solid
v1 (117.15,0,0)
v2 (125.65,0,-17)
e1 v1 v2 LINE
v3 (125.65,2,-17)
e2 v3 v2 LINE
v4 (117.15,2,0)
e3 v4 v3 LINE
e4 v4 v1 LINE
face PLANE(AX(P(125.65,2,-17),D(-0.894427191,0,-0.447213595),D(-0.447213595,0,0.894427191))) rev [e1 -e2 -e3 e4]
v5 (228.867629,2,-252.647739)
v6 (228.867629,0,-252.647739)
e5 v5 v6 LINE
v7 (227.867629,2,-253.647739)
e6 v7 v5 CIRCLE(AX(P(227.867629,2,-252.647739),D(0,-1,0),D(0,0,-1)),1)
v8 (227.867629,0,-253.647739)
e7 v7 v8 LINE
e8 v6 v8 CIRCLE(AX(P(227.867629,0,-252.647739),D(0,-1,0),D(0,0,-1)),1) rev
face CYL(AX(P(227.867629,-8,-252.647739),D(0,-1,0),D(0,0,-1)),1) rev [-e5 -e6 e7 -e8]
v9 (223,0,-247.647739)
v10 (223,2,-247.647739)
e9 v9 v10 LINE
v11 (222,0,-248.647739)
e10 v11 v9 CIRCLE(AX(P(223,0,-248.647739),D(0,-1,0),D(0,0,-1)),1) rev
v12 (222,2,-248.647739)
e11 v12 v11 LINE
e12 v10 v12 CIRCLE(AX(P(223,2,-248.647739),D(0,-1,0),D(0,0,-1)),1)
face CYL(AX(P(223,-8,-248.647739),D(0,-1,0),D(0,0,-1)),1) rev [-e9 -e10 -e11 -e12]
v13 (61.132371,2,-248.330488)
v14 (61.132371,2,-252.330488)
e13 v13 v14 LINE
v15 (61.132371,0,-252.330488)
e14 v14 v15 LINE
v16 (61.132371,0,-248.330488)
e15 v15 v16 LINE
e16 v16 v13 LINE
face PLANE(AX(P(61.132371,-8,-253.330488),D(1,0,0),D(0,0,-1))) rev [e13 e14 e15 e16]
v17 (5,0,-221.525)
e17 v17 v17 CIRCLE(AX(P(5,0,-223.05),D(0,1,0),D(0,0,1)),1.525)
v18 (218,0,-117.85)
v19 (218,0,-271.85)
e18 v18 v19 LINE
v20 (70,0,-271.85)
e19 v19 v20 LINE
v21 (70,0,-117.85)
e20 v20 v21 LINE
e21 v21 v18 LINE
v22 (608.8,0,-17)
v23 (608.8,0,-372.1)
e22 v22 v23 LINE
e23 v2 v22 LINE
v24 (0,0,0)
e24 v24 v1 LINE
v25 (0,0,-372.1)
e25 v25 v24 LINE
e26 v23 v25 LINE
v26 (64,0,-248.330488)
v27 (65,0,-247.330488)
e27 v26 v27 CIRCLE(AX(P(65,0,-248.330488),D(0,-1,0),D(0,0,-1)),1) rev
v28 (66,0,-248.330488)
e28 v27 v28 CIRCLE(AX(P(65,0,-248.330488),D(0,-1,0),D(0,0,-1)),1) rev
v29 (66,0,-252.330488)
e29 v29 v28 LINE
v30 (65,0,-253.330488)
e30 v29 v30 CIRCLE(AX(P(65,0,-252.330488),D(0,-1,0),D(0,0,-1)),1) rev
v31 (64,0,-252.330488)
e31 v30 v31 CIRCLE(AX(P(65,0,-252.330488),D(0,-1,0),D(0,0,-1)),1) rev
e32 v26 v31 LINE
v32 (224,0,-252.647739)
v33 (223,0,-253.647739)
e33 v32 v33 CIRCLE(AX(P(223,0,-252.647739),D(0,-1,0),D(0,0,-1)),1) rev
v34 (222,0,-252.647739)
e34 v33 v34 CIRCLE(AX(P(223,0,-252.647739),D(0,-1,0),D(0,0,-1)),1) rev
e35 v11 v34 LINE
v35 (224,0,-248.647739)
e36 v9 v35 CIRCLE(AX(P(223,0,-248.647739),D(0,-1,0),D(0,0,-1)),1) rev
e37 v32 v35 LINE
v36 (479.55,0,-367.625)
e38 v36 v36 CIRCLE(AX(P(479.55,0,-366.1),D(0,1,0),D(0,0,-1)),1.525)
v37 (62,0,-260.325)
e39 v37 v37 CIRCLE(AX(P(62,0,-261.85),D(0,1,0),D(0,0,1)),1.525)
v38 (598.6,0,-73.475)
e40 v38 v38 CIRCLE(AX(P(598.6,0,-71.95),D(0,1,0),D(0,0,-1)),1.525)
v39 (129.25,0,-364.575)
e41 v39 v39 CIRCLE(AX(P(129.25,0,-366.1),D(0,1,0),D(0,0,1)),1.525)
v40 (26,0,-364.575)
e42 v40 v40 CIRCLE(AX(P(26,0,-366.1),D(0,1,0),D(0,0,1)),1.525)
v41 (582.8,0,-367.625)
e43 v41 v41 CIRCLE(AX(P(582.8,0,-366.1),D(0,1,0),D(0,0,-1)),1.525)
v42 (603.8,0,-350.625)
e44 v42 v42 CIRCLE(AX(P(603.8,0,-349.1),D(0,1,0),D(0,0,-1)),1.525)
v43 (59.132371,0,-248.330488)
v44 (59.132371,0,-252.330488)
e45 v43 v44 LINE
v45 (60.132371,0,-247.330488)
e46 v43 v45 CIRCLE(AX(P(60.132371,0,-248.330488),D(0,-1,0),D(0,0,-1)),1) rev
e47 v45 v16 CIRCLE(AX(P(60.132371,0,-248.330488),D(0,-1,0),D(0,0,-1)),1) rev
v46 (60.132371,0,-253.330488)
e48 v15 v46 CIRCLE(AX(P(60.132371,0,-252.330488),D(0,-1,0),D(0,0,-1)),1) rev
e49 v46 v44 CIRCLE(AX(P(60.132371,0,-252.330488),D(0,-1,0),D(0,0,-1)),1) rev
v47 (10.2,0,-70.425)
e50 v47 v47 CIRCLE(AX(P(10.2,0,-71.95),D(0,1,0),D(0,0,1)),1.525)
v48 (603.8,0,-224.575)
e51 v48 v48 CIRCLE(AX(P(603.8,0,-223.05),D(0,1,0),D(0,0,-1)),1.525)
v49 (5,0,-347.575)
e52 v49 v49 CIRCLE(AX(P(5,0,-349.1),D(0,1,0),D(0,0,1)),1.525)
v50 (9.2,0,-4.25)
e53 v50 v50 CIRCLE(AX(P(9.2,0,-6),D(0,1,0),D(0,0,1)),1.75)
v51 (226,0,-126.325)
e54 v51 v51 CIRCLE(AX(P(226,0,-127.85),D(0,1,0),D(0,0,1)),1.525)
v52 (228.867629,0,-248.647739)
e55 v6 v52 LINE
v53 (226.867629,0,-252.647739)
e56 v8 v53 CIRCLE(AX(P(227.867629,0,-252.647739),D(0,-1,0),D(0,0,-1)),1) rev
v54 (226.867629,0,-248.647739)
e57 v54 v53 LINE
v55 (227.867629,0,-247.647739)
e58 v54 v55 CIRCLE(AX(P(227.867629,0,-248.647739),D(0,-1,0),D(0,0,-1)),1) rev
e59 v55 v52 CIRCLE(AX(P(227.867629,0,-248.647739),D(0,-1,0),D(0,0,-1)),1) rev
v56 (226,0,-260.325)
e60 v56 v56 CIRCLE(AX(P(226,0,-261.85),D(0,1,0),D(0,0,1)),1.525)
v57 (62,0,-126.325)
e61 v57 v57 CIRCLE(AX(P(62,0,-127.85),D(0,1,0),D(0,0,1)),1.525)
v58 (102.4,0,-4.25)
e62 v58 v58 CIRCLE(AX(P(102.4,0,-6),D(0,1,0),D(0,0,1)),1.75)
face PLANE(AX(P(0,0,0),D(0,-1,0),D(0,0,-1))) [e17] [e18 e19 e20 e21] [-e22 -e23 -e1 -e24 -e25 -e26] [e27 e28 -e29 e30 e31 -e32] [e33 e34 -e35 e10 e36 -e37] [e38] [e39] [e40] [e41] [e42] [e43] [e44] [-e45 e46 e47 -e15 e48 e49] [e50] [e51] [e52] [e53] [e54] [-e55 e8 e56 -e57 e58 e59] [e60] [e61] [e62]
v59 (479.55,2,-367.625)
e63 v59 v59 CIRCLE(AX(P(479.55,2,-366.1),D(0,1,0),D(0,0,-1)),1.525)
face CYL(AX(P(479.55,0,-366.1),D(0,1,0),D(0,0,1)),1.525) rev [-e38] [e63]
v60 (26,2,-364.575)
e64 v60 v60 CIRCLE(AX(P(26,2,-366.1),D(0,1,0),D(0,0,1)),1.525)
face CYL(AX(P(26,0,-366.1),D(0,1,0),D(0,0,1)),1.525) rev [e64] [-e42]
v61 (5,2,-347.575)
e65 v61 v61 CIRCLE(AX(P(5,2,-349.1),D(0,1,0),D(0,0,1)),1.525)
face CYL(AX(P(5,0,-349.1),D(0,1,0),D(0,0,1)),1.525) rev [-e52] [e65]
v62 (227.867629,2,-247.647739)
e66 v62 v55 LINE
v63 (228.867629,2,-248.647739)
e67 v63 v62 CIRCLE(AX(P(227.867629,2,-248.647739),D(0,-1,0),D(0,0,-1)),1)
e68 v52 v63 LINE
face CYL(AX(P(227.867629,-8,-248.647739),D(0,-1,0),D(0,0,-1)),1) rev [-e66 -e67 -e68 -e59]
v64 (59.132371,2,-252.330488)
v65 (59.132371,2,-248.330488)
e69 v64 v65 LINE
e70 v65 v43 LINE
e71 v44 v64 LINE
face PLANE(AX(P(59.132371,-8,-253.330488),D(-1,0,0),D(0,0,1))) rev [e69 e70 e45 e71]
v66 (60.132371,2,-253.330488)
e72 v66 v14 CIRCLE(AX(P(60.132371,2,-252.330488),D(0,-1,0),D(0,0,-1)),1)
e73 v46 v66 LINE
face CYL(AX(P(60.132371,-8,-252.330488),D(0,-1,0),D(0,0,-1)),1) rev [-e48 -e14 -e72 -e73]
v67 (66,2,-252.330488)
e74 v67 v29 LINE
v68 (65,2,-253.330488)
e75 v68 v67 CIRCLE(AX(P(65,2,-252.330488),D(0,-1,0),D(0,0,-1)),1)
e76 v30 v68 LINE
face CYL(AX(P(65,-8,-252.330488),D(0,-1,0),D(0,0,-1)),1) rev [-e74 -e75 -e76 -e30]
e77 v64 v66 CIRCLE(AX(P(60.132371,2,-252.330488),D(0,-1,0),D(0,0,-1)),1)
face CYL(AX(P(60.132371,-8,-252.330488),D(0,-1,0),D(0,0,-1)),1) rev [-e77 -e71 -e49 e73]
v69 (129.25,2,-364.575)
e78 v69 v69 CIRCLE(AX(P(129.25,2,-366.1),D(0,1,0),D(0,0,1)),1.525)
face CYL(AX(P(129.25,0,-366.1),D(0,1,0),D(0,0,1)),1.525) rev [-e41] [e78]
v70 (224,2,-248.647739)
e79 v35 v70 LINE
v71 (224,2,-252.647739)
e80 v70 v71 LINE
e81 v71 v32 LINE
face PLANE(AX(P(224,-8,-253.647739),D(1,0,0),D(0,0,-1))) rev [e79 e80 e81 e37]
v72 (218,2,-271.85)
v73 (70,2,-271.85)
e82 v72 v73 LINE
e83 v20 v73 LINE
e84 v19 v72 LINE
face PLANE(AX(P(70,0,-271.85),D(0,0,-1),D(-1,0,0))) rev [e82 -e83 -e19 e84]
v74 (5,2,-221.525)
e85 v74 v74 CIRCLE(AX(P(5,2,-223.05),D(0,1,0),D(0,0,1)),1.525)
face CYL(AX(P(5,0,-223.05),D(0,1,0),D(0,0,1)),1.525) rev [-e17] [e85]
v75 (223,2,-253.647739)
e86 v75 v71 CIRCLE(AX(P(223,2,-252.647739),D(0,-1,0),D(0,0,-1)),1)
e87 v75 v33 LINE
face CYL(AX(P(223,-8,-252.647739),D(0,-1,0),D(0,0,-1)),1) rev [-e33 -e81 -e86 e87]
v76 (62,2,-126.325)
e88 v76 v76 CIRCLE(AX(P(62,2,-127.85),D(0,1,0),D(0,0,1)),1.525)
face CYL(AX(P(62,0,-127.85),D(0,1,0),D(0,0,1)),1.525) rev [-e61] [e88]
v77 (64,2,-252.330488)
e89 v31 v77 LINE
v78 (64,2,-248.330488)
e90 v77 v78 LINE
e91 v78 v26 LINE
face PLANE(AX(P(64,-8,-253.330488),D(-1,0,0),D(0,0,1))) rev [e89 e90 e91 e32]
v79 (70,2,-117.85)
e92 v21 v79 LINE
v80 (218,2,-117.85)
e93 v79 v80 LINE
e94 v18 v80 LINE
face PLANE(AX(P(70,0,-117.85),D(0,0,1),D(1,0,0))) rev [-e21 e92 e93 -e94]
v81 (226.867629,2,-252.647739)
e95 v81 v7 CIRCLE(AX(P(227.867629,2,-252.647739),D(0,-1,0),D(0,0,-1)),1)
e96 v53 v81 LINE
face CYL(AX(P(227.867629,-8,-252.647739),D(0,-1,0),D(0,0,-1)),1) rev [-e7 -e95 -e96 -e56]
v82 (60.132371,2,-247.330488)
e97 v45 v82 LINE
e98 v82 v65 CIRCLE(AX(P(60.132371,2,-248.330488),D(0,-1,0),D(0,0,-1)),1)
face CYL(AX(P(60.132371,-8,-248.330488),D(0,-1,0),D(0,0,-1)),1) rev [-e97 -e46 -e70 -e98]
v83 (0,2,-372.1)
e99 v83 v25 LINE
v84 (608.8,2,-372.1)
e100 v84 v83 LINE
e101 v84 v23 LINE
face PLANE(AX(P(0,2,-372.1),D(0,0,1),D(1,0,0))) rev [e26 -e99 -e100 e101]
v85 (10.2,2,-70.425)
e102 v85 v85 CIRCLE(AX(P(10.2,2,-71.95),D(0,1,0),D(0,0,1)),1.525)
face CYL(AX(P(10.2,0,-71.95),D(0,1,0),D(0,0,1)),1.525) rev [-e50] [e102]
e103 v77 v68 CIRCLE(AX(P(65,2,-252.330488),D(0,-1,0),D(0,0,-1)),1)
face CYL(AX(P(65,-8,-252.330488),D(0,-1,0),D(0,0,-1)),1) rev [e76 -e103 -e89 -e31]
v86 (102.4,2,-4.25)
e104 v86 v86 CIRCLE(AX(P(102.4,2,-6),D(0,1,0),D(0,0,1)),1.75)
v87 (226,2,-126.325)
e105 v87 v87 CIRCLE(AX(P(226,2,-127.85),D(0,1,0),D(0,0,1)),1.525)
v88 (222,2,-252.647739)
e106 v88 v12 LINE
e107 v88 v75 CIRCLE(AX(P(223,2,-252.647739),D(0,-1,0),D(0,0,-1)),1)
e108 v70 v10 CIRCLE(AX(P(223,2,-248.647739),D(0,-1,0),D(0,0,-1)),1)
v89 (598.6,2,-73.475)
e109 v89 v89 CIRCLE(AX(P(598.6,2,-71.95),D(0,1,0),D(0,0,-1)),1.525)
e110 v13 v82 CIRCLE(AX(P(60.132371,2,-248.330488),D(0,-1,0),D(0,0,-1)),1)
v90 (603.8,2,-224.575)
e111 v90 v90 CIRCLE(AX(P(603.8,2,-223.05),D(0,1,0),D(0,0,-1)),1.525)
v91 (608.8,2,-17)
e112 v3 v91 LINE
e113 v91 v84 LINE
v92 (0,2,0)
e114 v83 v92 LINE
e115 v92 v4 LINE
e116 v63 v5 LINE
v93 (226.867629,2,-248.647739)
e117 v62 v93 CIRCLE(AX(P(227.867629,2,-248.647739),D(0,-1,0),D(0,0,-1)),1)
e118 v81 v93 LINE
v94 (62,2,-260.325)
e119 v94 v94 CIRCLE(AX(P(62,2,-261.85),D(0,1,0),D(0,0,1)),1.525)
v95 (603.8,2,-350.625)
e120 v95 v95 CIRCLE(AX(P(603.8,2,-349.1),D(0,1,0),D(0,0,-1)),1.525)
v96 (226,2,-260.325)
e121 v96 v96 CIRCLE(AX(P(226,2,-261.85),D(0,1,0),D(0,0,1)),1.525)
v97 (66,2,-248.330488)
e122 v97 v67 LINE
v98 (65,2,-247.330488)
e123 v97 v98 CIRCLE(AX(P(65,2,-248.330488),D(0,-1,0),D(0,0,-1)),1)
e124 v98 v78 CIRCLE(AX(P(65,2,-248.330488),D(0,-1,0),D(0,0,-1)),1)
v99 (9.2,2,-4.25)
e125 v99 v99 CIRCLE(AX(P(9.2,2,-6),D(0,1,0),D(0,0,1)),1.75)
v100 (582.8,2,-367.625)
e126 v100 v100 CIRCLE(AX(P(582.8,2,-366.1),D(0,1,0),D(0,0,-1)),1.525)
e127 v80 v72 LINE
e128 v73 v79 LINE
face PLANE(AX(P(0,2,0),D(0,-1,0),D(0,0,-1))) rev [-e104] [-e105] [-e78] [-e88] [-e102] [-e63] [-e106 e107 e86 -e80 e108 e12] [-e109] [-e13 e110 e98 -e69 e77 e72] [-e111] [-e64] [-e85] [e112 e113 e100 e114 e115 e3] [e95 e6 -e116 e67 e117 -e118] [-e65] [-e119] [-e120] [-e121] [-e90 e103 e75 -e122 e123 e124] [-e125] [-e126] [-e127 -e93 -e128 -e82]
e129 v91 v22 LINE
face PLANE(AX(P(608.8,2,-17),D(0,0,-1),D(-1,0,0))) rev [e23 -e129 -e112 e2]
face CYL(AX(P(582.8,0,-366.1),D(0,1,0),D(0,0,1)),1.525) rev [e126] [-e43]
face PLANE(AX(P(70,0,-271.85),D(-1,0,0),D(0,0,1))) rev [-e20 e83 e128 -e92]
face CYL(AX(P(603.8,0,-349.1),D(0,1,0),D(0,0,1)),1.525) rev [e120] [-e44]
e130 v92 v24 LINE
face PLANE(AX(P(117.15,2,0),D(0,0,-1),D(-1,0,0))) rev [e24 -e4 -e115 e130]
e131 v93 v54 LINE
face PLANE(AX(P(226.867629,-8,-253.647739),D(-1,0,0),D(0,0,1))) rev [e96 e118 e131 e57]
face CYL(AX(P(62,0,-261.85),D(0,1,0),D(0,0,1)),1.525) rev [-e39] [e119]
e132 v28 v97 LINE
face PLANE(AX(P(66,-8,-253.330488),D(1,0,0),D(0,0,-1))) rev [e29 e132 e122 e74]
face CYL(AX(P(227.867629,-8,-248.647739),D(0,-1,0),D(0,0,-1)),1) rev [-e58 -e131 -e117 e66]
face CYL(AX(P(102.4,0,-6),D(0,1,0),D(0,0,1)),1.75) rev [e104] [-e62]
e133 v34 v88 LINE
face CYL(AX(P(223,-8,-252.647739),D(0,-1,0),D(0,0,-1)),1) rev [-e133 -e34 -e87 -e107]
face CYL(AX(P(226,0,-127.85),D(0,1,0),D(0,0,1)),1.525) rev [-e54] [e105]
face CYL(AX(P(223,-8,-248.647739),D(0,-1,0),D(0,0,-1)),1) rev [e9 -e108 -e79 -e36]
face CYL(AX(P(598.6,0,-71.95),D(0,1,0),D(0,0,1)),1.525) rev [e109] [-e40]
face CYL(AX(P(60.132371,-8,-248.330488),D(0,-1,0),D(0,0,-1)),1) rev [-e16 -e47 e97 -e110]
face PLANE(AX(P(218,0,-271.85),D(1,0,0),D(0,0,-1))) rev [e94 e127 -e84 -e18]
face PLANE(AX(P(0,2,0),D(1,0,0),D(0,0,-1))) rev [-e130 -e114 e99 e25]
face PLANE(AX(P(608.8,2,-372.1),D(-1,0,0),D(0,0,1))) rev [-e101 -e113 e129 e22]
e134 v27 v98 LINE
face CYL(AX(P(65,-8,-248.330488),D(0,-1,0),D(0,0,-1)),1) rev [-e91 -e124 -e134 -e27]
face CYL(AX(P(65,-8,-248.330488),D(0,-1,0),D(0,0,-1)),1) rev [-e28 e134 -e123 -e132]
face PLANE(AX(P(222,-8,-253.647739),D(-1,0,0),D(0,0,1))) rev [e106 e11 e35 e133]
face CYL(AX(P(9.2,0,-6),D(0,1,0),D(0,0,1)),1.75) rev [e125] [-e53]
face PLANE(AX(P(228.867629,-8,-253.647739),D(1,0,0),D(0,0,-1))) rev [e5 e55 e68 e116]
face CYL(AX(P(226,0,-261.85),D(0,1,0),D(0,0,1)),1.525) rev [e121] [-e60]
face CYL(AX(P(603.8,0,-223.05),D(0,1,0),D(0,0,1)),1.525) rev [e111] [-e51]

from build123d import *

# Parameters (mm, degrees)
EXTRUDE_1_DEPTH     = 2
SKETCH_2_R          = 1.525
SKETCH_2_R_2        = 1.75
CUT_EXTRUDE_1_DEPTH = 2
SKETCH_3_W          = 2
SKETCH_3_H          = 6
CUT_EXTRUDE_2_DEPTH = 10
FILLET_2_R          = 1


with BuildPart() as part:
    # 草图1 → 凸台-拉伸1 (new body)
    with BuildSketch(Plane(origin=(0, 0, 0), x_dir=(1, 0, 0), z_dir=(0, 1, 0))):
        Polygon((0, 0), (0, 372.1), (608.8, 372.1), (608.8, 17), (125.65, 17), (117.15, 0), align=None)
    extrude(amount=EXTRUDE_1_DEPTH)

    # 草图2 → 切除-拉伸1 (cut)
    with BuildSketch(Plane(origin=(0, 2, 0), x_dir=(1, 0, 0), z_dir=(0, 1, 0))):
        with Locations(Location((5, 349.1, 0), (0, 0, 270))):
            Circle(SKETCH_2_R)
        with Locations(Location((26, 366.1, 0), (0, 0, 270))):
            Circle(SKETCH_2_R)
        with Locations(Location((129.25, 366.1, 0), (0, 0, 270))):
            Circle(SKETCH_2_R)
        with Locations(Location((5, 223.05, 0), (0, 0, 270))):
            Circle(SKETCH_2_R)
        with Locations(Location((603.8, 223.05, 0), (0, 0, 90))):
            Circle(SKETCH_2_R)
        with Locations(Location((479.55, 366.1, 0), (0, 0, 90))):
            Circle(SKETCH_2_R)
        with Locations(Location((582.8, 366.1, 0), (0, 0, 90))):
            Circle(SKETCH_2_R)
        with Locations(Location((603.8, 349.1, 0), (0, 0, 90))):
            Circle(SKETCH_2_R)
        with Locations(Location((10.2, 71.95, 0), (0, 0, 270))):
            Circle(SKETCH_2_R)
        with Locations(Location((598.6, 71.95, 0), (0, 0, 90))):
            Circle(SKETCH_2_R)
        with Locations(Location((9.2, 6, 0), (0, 0, 270))):
            Circle(SKETCH_2_R_2)
        with Locations(Location((102.4, 6, 0), (0, 0, 270))):
            Circle(SKETCH_2_R_2)
        with Locations(Location((62, 261.85, 0), (0, 0, 270))):
            Circle(SKETCH_2_R)
        with Locations(Location((62, 127.85, 0), (0, 0, 270))):
            Circle(SKETCH_2_R)
        with Locations(Location((226, 261.85, 0), (0, 0, 270))):
            Circle(SKETCH_2_R)
        with Locations(Location((226, 127.85, 0), (0, 0, 270))):
            Circle(SKETCH_2_R)
        Polygon((70, 271.85), (75, 271.85), (94, 271.85), (155, 271.85), (184, 271.85), (218, 271.85), (218, 117.85), (70, 117.85), align=None)
    extrude(amount=-CUT_EXTRUDE_1_DEPTH, mode=Mode.SUBTRACT)

    # 草图3 → 切除-拉伸2 (cut)
    with BuildSketch(Plane(origin=(0, 2, 0), x_dir=(1, 0, 0), z_dir=(0, 1, 0))):
        with Locations((65, 250.330488495)):
            Rectangle(SKETCH_3_W, SKETCH_3_H)
        with Locations((60.132371309, 250.330488495)):
            Rectangle(SKETCH_3_W, SKETCH_3_H)
        with Locations((227.867628691, 250.647738708)):
            Rectangle(SKETCH_3_W, SKETCH_3_H)
        with Locations((223, 250.647738708)):
            Rectangle(SKETCH_3_W, SKETCH_3_H)
    extrude(amount=-CUT_EXTRUDE_2_DEPTH, mode=Mode.SUBTRACT)

    # 圆角2
    fillet_2_edges = [part.edges().sort_by_distance(p)[0] for p in [
        (61.132371309, 1, -247.330488495),
        (59.132371309, 1, -247.330488495),
        (66, 1, -247.330488495),
        (64, 1, -247.330488495),
        (59.132371309, 1, -253.330488495),
        (61.132371309, 1, -253.330488495),
        (228.867628691, 1, -247.647738708),
        (222, 1, -247.647738708),
        (228.867628691, 1, -253.647738708),
        (224, 1, -253.647738708),
        (226.867628691, 1, -253.647738708),
        (222, 1, -253.647738708),
        (64, 1, -253.330488495),
        (66, 1, -253.330488495),
        (224, 1, -247.647738708),
        (226.867628691, 1, -247.647738708),
    ]]
    fillet(fillet_2_edges, radius=FILLET_2_R - 0.0001)  # a hair under: the kernel refuses the full size


solid = part.part
